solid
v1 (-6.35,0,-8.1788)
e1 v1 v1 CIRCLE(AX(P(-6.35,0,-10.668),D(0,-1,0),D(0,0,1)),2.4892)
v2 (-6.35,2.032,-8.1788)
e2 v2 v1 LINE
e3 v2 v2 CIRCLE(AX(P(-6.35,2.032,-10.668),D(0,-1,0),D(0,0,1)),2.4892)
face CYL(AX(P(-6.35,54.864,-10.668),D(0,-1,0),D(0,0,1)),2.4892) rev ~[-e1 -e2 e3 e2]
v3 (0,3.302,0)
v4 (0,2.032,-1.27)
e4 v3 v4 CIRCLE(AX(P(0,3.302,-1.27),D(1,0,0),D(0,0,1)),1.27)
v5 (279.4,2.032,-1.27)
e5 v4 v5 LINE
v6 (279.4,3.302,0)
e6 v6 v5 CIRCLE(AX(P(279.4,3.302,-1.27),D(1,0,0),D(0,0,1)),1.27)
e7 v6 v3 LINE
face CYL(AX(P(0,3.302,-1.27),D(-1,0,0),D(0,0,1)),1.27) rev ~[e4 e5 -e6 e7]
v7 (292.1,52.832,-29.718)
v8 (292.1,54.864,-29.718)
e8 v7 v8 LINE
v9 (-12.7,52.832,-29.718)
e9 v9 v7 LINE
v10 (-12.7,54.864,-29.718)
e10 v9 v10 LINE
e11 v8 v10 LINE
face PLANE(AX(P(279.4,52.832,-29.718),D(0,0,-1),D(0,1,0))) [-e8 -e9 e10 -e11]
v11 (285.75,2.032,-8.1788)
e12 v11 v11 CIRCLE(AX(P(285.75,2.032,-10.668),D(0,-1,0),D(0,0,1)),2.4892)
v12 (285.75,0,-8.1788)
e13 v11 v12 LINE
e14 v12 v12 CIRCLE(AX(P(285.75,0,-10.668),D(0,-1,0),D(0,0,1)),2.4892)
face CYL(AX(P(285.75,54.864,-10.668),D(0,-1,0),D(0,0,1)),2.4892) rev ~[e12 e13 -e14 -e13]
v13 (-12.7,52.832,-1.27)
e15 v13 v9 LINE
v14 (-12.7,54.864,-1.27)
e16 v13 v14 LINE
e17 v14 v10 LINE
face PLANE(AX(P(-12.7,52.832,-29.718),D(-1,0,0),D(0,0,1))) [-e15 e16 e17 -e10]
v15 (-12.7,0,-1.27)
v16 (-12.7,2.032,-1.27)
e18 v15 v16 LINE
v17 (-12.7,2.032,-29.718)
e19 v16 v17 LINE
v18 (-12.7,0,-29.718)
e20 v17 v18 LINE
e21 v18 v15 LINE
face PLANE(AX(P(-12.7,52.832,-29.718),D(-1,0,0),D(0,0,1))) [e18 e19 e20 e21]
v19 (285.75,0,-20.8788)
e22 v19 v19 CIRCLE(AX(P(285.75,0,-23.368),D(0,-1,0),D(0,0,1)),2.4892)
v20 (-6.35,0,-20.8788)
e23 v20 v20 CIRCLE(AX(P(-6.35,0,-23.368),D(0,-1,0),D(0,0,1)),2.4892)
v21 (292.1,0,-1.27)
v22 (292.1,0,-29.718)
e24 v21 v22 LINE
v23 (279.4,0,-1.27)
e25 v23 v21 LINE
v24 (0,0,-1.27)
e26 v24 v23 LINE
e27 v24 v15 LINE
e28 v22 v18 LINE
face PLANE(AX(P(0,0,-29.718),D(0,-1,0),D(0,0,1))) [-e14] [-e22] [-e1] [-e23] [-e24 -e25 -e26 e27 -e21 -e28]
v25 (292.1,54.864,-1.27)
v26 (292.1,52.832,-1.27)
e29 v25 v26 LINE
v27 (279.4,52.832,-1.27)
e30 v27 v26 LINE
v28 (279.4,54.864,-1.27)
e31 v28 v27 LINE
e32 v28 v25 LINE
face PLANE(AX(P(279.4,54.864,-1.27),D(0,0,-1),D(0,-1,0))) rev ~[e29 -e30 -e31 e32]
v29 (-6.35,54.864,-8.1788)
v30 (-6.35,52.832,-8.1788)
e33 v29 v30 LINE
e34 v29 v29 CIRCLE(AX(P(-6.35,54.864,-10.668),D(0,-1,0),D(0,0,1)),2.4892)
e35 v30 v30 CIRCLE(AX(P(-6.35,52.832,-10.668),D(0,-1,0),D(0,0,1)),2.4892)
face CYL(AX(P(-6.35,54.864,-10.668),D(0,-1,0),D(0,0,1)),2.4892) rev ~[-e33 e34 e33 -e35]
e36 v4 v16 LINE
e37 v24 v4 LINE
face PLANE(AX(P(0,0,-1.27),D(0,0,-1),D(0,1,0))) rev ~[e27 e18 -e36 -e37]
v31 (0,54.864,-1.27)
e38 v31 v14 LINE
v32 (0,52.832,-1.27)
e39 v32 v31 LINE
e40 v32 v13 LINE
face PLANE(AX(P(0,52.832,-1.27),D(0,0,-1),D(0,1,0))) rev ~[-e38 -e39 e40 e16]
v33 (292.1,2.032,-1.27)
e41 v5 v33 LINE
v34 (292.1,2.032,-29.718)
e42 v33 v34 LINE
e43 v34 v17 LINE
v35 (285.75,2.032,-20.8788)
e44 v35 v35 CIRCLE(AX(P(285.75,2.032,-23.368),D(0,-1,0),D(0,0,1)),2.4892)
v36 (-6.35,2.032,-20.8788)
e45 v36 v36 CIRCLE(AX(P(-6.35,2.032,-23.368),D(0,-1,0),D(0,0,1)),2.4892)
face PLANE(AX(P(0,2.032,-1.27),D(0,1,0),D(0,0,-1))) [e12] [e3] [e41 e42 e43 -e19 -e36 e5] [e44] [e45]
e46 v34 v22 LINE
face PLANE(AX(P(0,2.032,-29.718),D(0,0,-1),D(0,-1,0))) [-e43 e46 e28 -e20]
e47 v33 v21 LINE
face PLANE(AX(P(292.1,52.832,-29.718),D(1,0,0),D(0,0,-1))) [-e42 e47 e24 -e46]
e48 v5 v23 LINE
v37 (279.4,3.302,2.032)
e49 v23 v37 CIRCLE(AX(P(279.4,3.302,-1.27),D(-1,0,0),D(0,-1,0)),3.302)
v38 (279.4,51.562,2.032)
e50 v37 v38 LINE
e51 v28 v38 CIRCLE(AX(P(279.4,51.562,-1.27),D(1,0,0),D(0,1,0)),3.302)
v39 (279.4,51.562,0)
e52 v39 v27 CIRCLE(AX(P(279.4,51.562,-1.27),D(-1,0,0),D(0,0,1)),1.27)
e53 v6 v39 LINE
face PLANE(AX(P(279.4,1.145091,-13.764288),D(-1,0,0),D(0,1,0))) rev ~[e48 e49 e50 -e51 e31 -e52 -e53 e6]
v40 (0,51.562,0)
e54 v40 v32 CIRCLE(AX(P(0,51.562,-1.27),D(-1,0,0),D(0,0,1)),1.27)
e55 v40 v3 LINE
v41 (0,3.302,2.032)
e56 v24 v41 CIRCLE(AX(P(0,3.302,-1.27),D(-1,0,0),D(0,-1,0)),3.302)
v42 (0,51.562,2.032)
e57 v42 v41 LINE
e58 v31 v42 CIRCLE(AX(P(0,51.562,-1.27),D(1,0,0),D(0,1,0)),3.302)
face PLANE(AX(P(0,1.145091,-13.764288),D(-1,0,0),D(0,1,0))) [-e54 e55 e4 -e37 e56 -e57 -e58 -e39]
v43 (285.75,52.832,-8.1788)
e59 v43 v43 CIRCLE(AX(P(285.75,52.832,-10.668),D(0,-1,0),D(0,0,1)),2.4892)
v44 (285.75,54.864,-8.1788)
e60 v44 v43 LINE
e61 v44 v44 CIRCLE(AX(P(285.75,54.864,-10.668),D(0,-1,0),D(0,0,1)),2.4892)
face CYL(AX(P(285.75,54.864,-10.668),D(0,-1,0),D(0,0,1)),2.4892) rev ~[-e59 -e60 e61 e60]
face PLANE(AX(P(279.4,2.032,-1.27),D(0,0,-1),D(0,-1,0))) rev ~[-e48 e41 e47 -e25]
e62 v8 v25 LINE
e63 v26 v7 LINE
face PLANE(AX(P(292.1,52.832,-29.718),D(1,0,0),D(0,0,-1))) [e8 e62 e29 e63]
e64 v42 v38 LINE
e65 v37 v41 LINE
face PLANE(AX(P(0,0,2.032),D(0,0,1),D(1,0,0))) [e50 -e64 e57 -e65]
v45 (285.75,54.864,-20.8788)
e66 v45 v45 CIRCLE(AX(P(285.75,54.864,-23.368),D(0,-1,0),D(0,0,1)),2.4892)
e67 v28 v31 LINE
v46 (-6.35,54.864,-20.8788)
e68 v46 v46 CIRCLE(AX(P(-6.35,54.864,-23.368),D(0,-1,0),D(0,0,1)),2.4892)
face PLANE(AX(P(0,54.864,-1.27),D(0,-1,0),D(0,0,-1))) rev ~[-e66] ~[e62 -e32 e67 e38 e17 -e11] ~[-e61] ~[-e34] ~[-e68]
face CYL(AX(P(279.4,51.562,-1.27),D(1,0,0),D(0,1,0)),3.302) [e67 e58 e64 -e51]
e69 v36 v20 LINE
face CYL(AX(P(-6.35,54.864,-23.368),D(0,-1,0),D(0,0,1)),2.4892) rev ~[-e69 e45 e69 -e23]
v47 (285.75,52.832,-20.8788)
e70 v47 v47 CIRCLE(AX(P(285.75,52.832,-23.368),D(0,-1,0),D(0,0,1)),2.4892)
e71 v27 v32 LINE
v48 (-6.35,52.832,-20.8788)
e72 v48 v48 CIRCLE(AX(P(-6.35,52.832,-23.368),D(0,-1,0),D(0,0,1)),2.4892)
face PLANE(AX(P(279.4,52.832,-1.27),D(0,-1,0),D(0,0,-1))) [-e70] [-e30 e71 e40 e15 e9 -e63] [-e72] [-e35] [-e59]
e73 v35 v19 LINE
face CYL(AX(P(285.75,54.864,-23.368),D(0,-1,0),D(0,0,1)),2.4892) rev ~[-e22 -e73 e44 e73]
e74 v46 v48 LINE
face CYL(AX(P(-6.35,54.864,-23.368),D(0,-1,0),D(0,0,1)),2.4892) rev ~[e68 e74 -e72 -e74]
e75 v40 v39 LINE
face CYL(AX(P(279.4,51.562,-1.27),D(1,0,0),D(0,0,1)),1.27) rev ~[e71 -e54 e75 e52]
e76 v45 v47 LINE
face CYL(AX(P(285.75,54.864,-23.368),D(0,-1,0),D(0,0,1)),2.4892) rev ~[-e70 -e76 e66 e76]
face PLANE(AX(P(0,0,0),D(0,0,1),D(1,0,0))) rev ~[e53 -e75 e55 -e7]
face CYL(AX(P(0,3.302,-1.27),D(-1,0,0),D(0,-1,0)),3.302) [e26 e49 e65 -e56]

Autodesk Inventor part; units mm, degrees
ref_plane "YZ Plane" through (0, 0, 0) normal (1, 0, 0) x (0, 1, 0)
ref_plane "XZ Plane" through (0, 0, 0) normal (0, 1, 0) x (-1, 0, 0)
ref_plane "XY Plane" through (0, 0, 0) normal (0, 0, 1) x (1, 0, 0)
sketch "Sketch1" plane through (0, 0, 0) normal (0, 0, 1) x (1, 0, 0)
  line L0 (0, 0) -> (279.4, 0)
  line L1 (279.4, 0) -> (279.4, 54.864)
  line L2 (279.4, 54.864) -> (0, 54.864)
  line L3 (0, 54.864) -> (0, 0)
  dimension "d0" = 54.864
  dimension "d1" = 279.4
extrude "Plate1" add sketch "Sketch1" along normal blind 2.032
sketch "Sketch2" plane through (279.4, 52.832, 2.032) normal (0, 1, 0) x (-1, 0, 0)
  line L0 (279.4, 0) -> (0, 0)
  line L1 (0, 0) -> (0, -31.75)
  line L2 (0, -31.75) -> (279.4, -31.75)
  line L3 (279.4, -31.75) -> (279.4, 0)
edge flange "Flange1" height 31.75 angle 90 thickness 2.032 bend radius 1.27 thickness toward (0, 1, 0) relief tear relief width 2.032 relief depth 1.016 edges at (139.7, 54.864, 0) wall of the first edge with corners at (0, 52.832, 2.032) (279.4, 52.832, 2.032) (279.4, 52.832, -29.718) (0, 52.832, -29.718)
bend "Bend1"
corner "Corner1"
sketch "Sketch3" plane through (0, 2.032, 2.032) normal (0, -1, 0) x (1, 0, 0)
  line L0 (279.4, 0) -> (0, 0)
  line L1 (0, 0) -> (0, -31.75)
  line L2 (0, -31.75) -> (279.4, -31.75)
  line L3 (279.4, -31.75) -> (279.4, 0)
edge flange "Flange2" height 31.75 angle 90 thickness 2.032 bend radius 1.27 thickness toward (0, -1, 0) relief tear relief width 2.032 relief depth 1.016 edges at (139.7, 0, 0) wall of the first edge with corners at (279.4, 2.032, 2.032) (0, 2.032, 2.032) (0, 2.032, -29.718) (279.4, 2.032, -29.718)
bend "Bend2"
corner "Corner2"
sketch "Sketch4" plane through (279.4, 52.832, -29.718) normal (1, 0, 0) x (0, 0, -1)
  line L0 (-28.448, 2.032) -> (-28.448, 0) projected
  line L1 (-28.448, 0) -> (0, 0) projected
  line L2 (0, 0) -> (0, 2.032) projected
  line L3 (0, 2.032) -> (-28.448, 2.032) projected
  arc A0 (-28.448, 2.032) -> (-31.75, -1.27) centre (-28.448, -1.27) ccw projected
  line L4 (-29.718, -1.27) -> (-31.75, -1.27) projected
  arc A1 (-28.448, 0) -> (-29.718, -1.27) centre (-28.448, -1.27) ccw projected
  line L5 (-28.448, -50.8) -> (-28.448, -52.832) projected
  line L6 (-28.448, -52.832) -> (0, -52.832) projected
  line L7 (0, -50.8) -> (0, -52.832) projected
  line L8 (-28.448, -50.8) -> (0, -50.8) projected
  arc A2 (-29.718, -49.53) -> (-28.448, -50.8) centre (-28.448, -49.53) ccw projected
  line L9 (-31.75, -49.53) -> (-29.718, -49.53) projected
  arc A3 (-31.75, -49.53) -> (-28.448, -52.832) centre (-28.448, -49.53) ccw projected
  point P0 (-29.718, -52.832)
extrude "Extrusion1" add sketch "Sketch4" along normal blind 12.7 contours L3 L2 L1 L0 | L8 L7 L6 L5
sketch "Sketch5" plane through (0, 52.832, -29.718) normal (-1, 0, 0) x (0, 0, 1)
  line L0 (28.448, 0) -> (28.448, 2.032) projected
  line L1 (28.448, 2.032) -> (0, 2.032) projected
  line L2 (0, 0) -> (0, 2.032) projected
  line L3 (28.448, 0) -> (0, 0) projected
  arc A0 (29.718, -1.27) -> (28.448, 0) centre (28.448, -1.27) ccw projected
  line L4 (31.75, -1.27) -> (29.718, -1.27) projected
  arc A1 (31.75, -1.27) -> (28.448, 2.032) centre (28.448, -1.27) ccw projected
  line L5 (28.448, -52.832) -> (28.448, -50.8) projected
  line L6 (28.448, -50.8) -> (0, -50.8) projected
  line L7 (0, -50.8) -> (0, -52.832) projected
  line L8 (0, -52.832) -> (28.448, -52.832) projected
  arc A2 (28.448, -52.832) -> (31.75, -49.53) centre (28.448, -49.53) ccw projected
  line L9 (29.718, -49.53) -> (31.75, -49.53) projected
  arc A3 (28.448, -50.8) -> (29.718, -49.53) centre (28.448, -49.53) ccw projected
  point P0 (29.718, -52.832)
extrude "Extrusion2" add sketch "Sketch5" along normal blind 12.7 contours L3 L2 L1 L0 | L8 L7 L6 L5
sketch "Sketch6" plane through (279.4, 54.864, -1.27) normal (0, 1, 0) x (1, 0, 0)
  line L0 (0, -3.302) -> (-279.4, -3.302) projected
  line L1 (12.7, 28.448) -> (12.7, 0) projected
  line L2 (-292.1, 0) -> (-292.1, 28.448) projected
  point P0 (-279.4, -1.27)
  point P1 (6.35, 9.398)
  point P2 (6.35, 22.098)
  point P3 (-285.75, 9.398)
  point P4 (-285.75, 22.098)
  dimension "d27" = 12.7
  dimension "d28" = 12.7
  dimension "d29" = 6.35
  dimension "d30" = 6.35
hole "Hole1" at (285.75, 54.864, -10.668) at (285.75, 54.864, -23.368) at (-6.35, 54.864, -10.668) at (-6.35, 54.864, -23.368) direction (0, -1, 0) diameter 4.9784 end through all
equation "\"d36\" = Thickness"
equation "\"d2\" = Thickness"
equation "\"d3\" = BendReliefWidth"
equation "\"d4\" = BendReliefDepth"
equation "\"d5\" = MinimumRemnant"
equation "\"d6\" = TransitionRadius"
equation "\"d9\" = BendRadius"
equation "\"d10\" = CornerReliefSize"
equation "\"d11\" = GapSize"
equation "\"d12\" = JacobiRadiusSize"
equation "\"d13\" = BendReliefWidth"
equation "\"d14\" = BendReliefDepth"
equation "\"d15\" = MinimumRemnant"
equation "\"d16\" = TransitionRadius"
equation "\"d19\" = BendRadius"
equation "\"d20\" = CornerReliefSize"
equation "\"d21\" = GapSize"
equation "\"d22\" = JacobiRadiusSize"
equation "\"BendReliefWidth\" = Thickness"
equation "\"BendReliefDepth\" = 0.5 * Thickness"
equation "\"CornerReliefSize\" = 4 * Thickness"
equation "\"MinimumRemnant\" = 2 * Thickness"
equation "\"TransitionRadius\" = BendRadius"
equation "\"JacobiRadiusSize\" = BendRadius"
equation "\"GapSize\" = Thickness"
equation "\"Thickness\" = 2.032"
equation "\"BendRadius\" = 1.27"
properties part number "Back brace" material "Aluminum 6061"
